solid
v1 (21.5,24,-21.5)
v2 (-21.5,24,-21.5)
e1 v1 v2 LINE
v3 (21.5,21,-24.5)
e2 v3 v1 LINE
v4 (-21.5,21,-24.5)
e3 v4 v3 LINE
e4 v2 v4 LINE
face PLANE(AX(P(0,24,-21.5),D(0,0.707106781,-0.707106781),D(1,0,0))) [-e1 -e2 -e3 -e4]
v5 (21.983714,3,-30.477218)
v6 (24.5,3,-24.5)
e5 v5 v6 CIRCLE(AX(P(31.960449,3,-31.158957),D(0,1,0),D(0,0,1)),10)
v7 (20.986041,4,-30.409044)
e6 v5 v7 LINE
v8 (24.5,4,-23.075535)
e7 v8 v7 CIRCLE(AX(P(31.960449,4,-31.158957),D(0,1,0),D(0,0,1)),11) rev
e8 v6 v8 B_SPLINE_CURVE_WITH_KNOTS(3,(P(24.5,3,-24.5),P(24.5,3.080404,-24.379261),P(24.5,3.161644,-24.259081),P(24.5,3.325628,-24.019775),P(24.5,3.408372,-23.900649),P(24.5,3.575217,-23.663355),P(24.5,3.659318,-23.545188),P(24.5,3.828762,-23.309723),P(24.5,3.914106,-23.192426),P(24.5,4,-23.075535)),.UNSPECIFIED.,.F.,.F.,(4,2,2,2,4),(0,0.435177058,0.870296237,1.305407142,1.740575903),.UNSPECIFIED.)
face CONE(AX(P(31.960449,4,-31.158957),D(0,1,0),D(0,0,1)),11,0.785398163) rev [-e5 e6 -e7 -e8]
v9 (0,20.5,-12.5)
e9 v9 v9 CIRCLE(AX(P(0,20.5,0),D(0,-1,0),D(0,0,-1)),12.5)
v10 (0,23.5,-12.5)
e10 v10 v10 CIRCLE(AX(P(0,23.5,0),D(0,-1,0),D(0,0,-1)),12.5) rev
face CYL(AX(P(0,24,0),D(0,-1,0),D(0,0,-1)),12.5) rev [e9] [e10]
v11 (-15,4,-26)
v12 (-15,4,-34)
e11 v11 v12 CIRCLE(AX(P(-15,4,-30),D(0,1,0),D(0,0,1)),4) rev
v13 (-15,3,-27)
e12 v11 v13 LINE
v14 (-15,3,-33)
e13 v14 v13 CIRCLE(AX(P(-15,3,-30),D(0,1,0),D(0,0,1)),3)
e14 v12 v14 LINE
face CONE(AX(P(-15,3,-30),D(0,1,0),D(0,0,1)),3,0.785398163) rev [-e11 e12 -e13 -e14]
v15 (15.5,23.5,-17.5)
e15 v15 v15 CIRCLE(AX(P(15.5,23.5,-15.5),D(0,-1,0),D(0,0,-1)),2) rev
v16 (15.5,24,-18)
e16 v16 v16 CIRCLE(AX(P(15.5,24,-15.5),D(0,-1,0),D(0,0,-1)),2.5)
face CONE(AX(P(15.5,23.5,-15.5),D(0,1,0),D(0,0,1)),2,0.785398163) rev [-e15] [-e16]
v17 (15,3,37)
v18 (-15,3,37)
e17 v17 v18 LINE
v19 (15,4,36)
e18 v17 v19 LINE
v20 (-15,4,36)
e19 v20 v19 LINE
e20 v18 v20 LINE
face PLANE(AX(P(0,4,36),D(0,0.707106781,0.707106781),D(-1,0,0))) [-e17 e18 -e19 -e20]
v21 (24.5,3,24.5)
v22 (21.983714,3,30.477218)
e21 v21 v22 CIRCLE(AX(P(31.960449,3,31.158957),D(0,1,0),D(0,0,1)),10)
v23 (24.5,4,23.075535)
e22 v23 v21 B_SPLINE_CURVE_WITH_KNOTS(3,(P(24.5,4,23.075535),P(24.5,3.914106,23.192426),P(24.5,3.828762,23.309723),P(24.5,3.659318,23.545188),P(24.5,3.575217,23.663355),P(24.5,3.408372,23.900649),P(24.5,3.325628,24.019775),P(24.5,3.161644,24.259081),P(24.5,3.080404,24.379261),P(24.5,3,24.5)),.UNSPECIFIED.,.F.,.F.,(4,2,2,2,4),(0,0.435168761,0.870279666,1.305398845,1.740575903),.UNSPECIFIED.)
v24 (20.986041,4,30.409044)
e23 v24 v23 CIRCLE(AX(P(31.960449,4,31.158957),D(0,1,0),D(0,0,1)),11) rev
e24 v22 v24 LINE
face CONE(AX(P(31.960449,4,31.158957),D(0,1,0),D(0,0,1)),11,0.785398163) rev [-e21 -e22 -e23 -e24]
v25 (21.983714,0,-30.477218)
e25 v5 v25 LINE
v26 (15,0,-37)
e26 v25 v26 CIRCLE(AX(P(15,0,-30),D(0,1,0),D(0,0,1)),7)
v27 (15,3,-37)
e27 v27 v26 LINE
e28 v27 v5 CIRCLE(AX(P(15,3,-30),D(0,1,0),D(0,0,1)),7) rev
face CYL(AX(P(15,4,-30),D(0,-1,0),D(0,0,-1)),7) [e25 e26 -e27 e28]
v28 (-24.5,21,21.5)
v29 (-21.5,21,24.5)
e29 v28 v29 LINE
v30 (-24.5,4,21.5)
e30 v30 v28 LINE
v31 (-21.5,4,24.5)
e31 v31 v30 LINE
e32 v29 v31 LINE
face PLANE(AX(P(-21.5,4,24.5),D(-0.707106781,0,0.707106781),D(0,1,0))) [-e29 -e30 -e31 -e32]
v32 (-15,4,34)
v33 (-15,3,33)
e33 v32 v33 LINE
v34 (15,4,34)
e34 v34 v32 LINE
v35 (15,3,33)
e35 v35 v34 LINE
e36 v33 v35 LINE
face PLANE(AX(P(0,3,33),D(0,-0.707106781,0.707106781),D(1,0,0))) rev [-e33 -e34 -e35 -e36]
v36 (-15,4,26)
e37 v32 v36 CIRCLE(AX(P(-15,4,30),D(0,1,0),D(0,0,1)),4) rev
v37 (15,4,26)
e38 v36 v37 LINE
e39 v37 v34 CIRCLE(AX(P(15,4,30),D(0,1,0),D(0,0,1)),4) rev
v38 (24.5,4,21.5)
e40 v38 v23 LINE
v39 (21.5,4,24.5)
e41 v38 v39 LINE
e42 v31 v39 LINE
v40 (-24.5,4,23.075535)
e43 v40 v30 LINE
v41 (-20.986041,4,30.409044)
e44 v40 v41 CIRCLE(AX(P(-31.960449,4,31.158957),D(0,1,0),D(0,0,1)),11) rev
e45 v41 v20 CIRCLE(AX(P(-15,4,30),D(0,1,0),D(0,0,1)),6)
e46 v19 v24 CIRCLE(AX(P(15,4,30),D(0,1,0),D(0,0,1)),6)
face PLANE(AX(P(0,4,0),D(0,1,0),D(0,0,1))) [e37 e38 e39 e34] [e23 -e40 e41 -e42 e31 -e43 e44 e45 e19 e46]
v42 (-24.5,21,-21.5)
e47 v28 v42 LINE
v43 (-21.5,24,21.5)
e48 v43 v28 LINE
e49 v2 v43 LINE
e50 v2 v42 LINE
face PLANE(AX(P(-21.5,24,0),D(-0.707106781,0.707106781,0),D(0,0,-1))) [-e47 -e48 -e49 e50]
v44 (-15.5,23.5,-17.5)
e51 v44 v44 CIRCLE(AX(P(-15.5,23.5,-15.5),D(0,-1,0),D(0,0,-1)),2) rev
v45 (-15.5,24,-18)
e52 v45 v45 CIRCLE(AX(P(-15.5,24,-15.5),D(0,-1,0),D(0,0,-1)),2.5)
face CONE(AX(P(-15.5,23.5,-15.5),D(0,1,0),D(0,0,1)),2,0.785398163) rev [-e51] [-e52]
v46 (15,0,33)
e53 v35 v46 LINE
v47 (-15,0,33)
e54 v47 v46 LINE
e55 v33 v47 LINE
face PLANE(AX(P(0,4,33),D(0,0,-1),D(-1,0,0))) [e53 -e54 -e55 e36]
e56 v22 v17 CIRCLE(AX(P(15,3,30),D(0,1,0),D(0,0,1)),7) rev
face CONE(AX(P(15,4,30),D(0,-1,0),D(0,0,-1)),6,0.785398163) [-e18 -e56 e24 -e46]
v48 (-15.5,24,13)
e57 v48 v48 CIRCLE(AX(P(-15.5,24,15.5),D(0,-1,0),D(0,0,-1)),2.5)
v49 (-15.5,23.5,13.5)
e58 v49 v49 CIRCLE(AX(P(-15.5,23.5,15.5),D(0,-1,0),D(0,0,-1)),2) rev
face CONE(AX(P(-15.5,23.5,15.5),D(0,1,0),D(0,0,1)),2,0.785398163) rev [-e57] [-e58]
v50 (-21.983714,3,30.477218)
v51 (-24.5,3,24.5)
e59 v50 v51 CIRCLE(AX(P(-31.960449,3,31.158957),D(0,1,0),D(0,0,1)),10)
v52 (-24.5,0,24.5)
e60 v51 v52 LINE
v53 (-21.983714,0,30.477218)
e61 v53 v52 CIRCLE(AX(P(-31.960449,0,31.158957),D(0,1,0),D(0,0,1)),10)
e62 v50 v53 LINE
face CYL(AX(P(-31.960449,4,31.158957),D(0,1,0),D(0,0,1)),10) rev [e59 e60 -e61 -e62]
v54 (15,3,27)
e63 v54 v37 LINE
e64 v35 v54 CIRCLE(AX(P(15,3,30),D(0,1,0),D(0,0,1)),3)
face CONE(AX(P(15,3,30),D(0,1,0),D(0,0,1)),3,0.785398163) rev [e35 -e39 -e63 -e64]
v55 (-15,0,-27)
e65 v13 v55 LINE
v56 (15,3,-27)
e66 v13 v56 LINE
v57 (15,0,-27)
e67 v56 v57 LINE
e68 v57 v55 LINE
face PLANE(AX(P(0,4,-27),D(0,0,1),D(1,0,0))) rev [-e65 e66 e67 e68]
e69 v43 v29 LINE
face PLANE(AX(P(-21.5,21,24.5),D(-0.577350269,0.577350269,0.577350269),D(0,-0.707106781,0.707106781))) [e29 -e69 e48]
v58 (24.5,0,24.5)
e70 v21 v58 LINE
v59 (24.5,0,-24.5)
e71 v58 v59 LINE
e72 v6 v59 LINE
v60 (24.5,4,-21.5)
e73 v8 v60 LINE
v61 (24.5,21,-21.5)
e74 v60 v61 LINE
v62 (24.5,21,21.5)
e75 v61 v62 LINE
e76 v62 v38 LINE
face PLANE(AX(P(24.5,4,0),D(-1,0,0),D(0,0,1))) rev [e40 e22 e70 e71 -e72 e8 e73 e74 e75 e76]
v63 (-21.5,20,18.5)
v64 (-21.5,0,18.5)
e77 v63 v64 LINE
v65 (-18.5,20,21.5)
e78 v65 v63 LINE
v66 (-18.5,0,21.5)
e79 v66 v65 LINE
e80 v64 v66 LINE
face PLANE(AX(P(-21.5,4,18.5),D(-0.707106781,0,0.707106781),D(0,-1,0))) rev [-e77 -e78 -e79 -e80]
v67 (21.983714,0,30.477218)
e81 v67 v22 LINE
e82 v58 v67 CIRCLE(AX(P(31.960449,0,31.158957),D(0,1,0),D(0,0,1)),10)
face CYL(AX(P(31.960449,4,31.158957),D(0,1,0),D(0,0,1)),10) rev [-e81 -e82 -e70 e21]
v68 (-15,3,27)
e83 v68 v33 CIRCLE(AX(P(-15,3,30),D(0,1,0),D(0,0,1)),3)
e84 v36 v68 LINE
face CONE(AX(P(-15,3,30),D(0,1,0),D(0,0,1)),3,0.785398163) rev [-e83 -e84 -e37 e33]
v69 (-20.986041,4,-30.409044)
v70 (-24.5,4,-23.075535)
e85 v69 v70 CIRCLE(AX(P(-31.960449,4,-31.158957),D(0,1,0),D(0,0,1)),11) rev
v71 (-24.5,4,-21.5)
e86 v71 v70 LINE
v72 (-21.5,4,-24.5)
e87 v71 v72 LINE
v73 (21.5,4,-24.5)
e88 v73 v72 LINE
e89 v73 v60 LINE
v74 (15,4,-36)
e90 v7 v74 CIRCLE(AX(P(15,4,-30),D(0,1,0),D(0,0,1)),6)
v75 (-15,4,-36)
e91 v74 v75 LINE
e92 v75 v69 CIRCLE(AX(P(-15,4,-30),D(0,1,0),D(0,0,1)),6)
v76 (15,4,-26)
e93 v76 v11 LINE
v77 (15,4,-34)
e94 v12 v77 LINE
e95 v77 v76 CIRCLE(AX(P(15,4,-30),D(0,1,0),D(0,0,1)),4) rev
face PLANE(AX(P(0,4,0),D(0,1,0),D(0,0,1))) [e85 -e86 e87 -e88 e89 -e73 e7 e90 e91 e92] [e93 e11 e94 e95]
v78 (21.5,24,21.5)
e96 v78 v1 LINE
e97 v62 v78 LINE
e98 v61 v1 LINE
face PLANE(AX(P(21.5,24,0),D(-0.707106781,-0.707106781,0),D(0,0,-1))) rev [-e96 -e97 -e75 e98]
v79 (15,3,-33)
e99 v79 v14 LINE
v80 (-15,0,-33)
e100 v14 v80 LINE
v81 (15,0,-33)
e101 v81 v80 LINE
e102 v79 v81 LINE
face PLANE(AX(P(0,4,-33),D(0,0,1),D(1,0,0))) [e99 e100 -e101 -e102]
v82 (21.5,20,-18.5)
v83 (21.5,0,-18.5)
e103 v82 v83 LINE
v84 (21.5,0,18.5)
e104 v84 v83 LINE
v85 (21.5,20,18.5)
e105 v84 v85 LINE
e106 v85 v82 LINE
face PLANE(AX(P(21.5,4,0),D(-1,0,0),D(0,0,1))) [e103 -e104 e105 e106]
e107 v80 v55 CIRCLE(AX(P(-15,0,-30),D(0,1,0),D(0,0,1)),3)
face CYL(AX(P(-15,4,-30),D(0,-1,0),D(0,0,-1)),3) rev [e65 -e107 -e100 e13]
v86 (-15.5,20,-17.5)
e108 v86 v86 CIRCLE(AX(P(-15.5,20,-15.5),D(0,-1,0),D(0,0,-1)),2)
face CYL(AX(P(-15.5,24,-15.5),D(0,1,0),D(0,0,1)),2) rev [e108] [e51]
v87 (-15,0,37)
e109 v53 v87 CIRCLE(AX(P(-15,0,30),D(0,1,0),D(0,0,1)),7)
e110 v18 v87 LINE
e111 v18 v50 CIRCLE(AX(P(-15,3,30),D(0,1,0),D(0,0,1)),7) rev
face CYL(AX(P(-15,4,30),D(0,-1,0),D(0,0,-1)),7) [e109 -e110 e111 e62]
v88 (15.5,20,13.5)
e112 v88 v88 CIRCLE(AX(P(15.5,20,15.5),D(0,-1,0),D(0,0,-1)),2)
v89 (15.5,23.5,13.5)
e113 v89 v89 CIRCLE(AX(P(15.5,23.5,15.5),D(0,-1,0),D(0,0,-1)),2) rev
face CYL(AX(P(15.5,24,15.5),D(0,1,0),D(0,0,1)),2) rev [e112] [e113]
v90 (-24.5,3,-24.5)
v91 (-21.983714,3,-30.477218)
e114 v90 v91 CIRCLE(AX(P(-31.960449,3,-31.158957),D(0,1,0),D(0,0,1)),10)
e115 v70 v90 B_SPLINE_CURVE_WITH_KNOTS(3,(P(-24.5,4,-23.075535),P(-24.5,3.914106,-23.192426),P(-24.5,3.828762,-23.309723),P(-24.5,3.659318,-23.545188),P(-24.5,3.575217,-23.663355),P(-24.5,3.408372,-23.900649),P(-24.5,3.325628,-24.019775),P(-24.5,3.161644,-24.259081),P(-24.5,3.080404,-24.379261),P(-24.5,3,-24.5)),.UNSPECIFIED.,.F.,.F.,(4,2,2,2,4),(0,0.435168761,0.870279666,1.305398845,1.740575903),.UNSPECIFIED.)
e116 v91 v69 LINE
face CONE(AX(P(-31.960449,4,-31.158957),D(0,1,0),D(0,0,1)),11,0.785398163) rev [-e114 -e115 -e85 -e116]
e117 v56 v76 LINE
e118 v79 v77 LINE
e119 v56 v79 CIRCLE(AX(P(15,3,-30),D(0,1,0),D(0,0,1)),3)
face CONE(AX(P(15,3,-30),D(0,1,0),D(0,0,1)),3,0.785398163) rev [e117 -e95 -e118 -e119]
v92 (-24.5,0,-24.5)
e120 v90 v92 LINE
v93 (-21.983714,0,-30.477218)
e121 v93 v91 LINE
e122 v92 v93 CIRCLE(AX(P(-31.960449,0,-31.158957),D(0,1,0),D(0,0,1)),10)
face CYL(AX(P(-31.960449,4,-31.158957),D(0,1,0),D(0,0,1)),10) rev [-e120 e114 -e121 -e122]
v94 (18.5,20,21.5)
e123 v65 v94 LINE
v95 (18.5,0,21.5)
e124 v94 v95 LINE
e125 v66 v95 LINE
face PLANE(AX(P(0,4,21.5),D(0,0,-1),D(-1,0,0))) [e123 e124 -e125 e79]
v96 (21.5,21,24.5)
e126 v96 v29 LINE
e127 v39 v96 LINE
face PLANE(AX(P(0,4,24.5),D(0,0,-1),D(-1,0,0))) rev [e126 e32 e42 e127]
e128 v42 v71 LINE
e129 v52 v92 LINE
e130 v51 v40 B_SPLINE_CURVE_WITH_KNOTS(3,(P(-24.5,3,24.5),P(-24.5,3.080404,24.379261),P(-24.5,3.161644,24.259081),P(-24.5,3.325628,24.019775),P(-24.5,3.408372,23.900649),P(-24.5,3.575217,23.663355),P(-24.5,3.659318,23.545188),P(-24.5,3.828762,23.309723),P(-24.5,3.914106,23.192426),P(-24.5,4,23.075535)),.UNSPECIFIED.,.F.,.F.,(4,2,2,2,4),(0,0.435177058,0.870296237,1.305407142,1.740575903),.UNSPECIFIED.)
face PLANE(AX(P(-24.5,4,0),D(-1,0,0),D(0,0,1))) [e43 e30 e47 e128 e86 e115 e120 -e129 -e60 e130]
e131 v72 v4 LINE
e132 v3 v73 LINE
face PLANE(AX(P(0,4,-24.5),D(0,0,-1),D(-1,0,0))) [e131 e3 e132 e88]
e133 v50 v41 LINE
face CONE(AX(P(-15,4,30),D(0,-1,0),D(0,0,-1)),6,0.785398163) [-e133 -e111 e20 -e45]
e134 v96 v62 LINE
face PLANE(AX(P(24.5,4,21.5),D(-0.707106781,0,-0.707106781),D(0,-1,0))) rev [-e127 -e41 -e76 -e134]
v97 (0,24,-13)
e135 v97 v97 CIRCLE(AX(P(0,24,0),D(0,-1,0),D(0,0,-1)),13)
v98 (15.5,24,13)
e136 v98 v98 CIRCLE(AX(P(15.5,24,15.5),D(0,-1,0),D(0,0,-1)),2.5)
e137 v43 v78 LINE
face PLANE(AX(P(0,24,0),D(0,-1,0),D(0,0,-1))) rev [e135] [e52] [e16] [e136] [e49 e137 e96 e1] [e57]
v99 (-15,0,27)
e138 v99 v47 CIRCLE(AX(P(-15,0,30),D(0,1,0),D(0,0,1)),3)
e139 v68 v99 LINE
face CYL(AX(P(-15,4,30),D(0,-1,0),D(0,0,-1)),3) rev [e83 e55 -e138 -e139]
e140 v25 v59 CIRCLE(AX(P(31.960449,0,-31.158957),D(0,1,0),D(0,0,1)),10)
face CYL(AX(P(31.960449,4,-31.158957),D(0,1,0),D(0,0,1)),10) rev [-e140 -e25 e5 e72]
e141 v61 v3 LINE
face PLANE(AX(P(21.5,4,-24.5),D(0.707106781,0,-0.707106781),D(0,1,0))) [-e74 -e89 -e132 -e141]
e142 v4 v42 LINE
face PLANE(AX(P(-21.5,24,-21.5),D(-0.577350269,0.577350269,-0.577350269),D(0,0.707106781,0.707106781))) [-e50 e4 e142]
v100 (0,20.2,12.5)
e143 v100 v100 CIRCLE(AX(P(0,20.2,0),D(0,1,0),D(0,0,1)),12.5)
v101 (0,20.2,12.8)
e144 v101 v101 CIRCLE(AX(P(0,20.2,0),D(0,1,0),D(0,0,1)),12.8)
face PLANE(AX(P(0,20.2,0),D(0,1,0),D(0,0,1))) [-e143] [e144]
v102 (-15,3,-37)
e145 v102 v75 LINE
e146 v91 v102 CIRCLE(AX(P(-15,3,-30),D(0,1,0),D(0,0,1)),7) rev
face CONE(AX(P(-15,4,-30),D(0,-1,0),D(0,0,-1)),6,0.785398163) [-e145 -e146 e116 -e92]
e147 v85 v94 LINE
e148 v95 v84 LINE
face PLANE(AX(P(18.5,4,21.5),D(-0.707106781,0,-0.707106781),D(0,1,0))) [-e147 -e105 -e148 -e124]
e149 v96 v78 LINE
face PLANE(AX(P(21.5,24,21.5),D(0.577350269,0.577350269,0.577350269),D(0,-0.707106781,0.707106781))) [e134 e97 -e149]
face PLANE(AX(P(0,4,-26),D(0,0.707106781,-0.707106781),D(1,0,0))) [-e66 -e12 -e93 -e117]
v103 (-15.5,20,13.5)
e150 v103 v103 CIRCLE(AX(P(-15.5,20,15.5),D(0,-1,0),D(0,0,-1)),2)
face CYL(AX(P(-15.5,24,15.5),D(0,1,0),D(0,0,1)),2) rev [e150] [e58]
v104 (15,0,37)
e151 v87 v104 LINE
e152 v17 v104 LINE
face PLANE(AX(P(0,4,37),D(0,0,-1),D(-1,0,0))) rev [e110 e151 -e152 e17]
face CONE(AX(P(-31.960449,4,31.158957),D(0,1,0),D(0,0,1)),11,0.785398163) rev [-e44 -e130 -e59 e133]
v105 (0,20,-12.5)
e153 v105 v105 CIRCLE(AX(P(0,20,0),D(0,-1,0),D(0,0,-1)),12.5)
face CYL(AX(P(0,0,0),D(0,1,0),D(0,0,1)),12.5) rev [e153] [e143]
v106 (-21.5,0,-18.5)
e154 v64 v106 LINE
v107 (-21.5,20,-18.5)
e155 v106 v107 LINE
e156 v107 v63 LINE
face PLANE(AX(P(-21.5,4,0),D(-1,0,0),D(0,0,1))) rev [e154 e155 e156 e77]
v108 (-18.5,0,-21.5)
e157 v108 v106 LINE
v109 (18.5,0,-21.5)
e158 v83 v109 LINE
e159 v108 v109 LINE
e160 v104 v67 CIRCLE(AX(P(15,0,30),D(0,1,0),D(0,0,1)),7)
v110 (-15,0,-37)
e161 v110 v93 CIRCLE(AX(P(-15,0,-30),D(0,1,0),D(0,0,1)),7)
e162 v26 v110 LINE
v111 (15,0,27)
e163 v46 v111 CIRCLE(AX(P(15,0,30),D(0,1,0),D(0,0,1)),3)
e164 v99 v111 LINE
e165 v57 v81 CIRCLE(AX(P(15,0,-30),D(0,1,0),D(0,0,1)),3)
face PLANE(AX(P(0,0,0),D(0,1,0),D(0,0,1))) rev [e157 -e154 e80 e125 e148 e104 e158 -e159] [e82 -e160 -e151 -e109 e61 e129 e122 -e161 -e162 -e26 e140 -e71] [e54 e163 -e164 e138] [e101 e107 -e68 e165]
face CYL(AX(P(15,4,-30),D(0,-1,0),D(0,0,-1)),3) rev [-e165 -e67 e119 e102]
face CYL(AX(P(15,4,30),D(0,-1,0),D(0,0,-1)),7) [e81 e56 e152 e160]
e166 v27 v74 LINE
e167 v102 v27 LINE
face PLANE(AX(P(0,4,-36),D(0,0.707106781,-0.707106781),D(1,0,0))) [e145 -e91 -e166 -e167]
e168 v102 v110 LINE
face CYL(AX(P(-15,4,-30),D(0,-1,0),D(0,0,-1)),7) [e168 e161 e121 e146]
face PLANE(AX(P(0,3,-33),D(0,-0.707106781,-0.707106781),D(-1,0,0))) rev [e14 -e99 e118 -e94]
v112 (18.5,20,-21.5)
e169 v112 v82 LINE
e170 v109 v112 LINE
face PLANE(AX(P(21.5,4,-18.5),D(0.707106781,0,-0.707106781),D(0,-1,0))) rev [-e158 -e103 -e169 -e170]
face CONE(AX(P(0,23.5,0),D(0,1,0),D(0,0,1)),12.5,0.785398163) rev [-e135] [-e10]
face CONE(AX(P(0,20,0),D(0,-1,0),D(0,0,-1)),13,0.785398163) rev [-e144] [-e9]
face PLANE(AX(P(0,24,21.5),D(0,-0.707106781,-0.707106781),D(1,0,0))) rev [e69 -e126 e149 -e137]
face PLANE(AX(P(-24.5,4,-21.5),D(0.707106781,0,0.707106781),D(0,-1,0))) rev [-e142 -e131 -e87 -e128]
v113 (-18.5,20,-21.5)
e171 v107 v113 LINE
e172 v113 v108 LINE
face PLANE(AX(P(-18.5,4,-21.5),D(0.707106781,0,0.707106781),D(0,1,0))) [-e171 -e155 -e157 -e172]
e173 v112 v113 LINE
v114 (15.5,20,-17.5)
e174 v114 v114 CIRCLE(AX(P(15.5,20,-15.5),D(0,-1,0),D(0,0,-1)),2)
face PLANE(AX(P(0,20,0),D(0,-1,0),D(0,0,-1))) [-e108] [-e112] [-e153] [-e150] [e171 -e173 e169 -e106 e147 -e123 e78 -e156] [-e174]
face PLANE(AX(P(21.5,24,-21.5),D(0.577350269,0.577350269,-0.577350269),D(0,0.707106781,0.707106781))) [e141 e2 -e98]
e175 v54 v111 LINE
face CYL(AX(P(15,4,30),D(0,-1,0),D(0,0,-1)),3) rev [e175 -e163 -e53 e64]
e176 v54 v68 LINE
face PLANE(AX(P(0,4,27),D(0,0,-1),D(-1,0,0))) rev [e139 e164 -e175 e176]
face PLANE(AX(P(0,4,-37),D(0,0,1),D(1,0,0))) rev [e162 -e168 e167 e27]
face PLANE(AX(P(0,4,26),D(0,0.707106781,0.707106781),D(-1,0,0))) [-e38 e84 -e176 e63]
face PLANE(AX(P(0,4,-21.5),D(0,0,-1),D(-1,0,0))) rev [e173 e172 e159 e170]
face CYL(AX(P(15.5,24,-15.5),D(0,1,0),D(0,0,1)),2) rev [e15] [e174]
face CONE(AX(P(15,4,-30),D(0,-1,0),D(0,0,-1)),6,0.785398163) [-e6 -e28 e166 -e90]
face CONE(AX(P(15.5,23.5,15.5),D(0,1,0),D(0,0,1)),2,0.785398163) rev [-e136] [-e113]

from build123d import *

# Parameters (mm, degrees)
SKETCH1_W             = 43
SKETCH1_H             = 43
BOSS_EXTRUDE1_DEPTH   = 4
SKETCH2_W             = 49
SKETCH2_H             = 49
SKETCH2_W_2           = 43
SKETCH2_H_2           = 43
BOSS_EXTRUDE2_DEPTH   = 16
FILLET1_R             = 10
SKETCH3_W             = 49
SKETCH3_H             = 49
SKETCH3_R             = 12.5
BOSS_EXTRUDE3_DEPTH   = 4
F_4_0MM_DOWEL_HOLE1_D = 4
CHAMFER1_SIZE         = 3
CHAMFER3_SIZE         = 0.5
CHAMFER4_SIZE         = 1
SKETCH8_W             = 38.715759924
SKETCH8_H             = 37.056710796
BOSS_EXTRUDE4_DEPTH   = 0.2
SKETCH9_R             = 12.5
CUT_EXTRUDE2_DEPTH    = 49.757460968
SKETCH10_R            = 2
CUT_EXTRUDE3_DEPTH    = 49.757460968


with BuildPart() as part:
    # Sketch1 → Boss-Extrude1 (new body)
    with BuildSketch(Plane(origin=(0, 0, 0), x_dir=(1, 0, 0), z_dir=(0, 1, 0))):
        with BuildLine():
            Line((-24.5, 24.5), (-19.330127019, 24.5))
            ThreePointArc((-19.330127019, 24.5), (-21.614378278, 32.291287847), (-15, 37))
            Line((-15, 37), (15, 37))
            ThreePointArc((15, 37), (21.614378278, 32.291287847), (19.330127019, 24.5))
            Line((19.330127019, 24.5), (24.5, 24.5))
            Line((24.5, 24.5), (24.5, 6.437196595))
            Line((24.5, 6.437196595), (24.5, -24.5))
            Line((24.5, -24.5), (19.330127019, -24.5))
            ThreePointArc((19.330127019, -24.5), (21.614378278, -32.291287847), (15, -37))
            Line((15, -37), (-15, -37))
            ThreePointArc((-15, -37), (-21.614378278, -32.291287847), (-19.330127019, -24.5))
            Line((-19.330127019, -24.5), (-24.5, -24.5))
            Line((-24.5, -24.5), (-24.5, 6.437196595))
            Line((-24.5, 6.437196595), (-24.5, 24.5))
        make_face()
        Rectangle(SKETCH1_W, SKETCH1_H, mode=Mode.SUBTRACT)
        with BuildLine():
            Line((15, 27), (-15, 27))
            ThreePointArc((-15, 27), (-18, 30), (-15, 33))
            Line((-15, 33), (15, 33))
            ThreePointArc((15, 33), (18, 30), (15, 27))
        make_face(mode=Mode.SUBTRACT)
        with BuildLine():
            Line((-15, -27), (15, -27))
            ThreePointArc((15, -27), (18, -30), (15, -33))
            Line((15, -33), (-15, -33))
            ThreePointArc((-15, -33), (-18, -30), (-15, -27))
        make_face(mode=Mode.SUBTRACT)
    extrude(amount=BOSS_EXTRUDE1_DEPTH)

    # Sketch2 → Boss-Extrude2 (add)
    with BuildSketch(Plane(origin=(0, 4, 0), x_dir=(1, 0, 0), z_dir=(0, 1, 0))):
        Rectangle(SKETCH2_W, SKETCH2_H)
        Rectangle(SKETCH2_W_2, SKETCH2_H_2, mode=Mode.SUBTRACT)
    extrude(amount=BOSS_EXTRUDE2_DEPTH)

    # Fillet1
    # the kernel refuses this fillet: 10 mm, written as the material it adds along each edge
    with BuildSketch(Plane(origin=(19.330127019, 0, 24.5), x_dir=(0.405761244184207, 0, 0.913979109563279), z_dir=(0, 1, 0))) as fillet1_piece_1:
        with BuildLine():
            CenterArc((11.211042432, 8.841903543), FILLET1_R, 204.310084353, 37.841965765)
            Line((2.097734093, 4.725155904), (1.915467926, 4.642820951))
            ThreePointArc((1.915467926, 4.642820951), (0.866071225, 2.443730201), (-0.182795822, 0.081152249))
            Line((-0.182795822, 0.081152249), (0.093425354, -0.176838071))
            ThreePointArc((0.093425354, -0.176838071), (3.269887376, 0.61066752), (6.446349398, -0.176838071))
            Line((6.446349398, -0.176838071), (6.539774752, 0))
        make_face()
    extrude(amount=4)
    with BuildSketch(Plane(origin=(19.330127019, 0, -24.5), x_dir=(1, 0, 0), z_dir=(0, 1, 0))) as fillet1_piece_2:
        with BuildLine():
            CenterArc((12.630321653, 6.658956796), FILLET1_R, 183.909110465, 37.841965765)
            Line((2.65358714, 5.977217504), (2.45405245, 5.963582719))
            ThreePointArc((2.45405245, 5.963582719), (1.884930926, 2.74082354), (-0.123717915, 0.157142857))
            Line((-0.123717915, 0.157142857), (0, -0.2))
            ThreePointArc((0, -0.2), (2.584936491, -0.2), (5.020664008, -0.133179136))
            Line((5.020664008, -0.133179136), (5.169872981, 0))
        make_face()
    extrude(amount=4)
    with BuildSketch(Plane(origin=(-19.330127019, 0, -24.5), x_dir=(-1, 0, 0), z_dir=(0, 1, 0))) as fillet1_piece_3:
        with BuildLine():
            CenterArc((12.630321653, -6.658956796), FILLET1_R, 138.24892377, 37.841965765)
            Line((2.65358714, -5.977217504), (2.45405245, -5.963582719))
            ThreePointArc((2.45405245, -5.963582719), (1.884930926, -2.74082354), (-0.123717915, -0.157142857))
            Line((-0.123717915, -0.157142857), (0, 0.2))
            ThreePointArc((0, 0.2), (2.584936491, 0.2), (5.020664008, 0.133179136))
            Line((5.020664008, 0.133179136), (5.169872981, 0))
        make_face()
    extrude(amount=4)
    with BuildSketch(Plane(origin=(-19.330127019, 0, 24.5), x_dir=(-0.40576124418420745, 0, 0.9139791095632787), z_dir=(0, 1, 0))) as fillet1_piece_4:
        with BuildLine():
            CenterArc((11.211042432, -8.841903543), FILLET1_R, 117.847949882, 37.841965765)
            Line((2.097734093, -4.725155904), (1.915467926, -4.642820951))
            ThreePointArc((1.915467926, -4.642820951), (0.866071225, -2.443730201), (-0.182795822, -0.081152249))
            Line((-0.182795822, -0.081152249), (0.093425354, 0.176838071))
            ThreePointArc((0.093425354, 0.176838071), (3.269887376, -0.61066752), (6.446349398, 0.176838071))
            Line((6.446349398, 0.176838071), (6.539774752, 0))
        make_face()
    extrude(amount=4)

    # Sketch3 → Boss-Extrude3 (add)
    with BuildSketch(Plane(origin=(0, 20, 0), x_dir=(1, 0, 0), z_dir=(0, 1, 0))):
        Rectangle(SKETCH3_W, SKETCH3_H)
        with Locations(Location((0, 0, 0), (0, 0, 270))):
            Circle(SKETCH3_R, mode=Mode.SUBTRACT)
    extrude(amount=BOSS_EXTRUDE3_DEPTH)

    # Ø4.0mm Dowel Hole1 (through all)
    with Locations(Plane(origin=(0, 24, 0), x_dir=(1, 0, 0), z_dir=(0, 1, 0))):
        with Locations((15.5, 15.5), (-15.5, 15.5), (-15.5, -15.5), (15.5, -15.5)):
            Hole(F_4_0MM_DOWEL_HOLE1_D / 2)

    # Chamfer1
    chamfer1_edges = [part.edges().sort_by_distance(p)[0] for p in [
        (24.5, 24, 0),
        (0, 24, -24.5),
        (-24.5, 24, 0),
        (0, 24, 24.5),
        (-24.5, 14, 24.5),
        (-24.5, 14, -24.5),
        (24.5, 14, -24.5),
        (24.5, 14, 24.5),
        (-21.5, 10, -21.5),
        (-21.5, 10, 21.5),
        (21.5, 10, 21.5),
        (21.5, 10, -21.5),
    ]]
    chamfer(chamfer1_edges, length=CHAMFER1_SIZE)

    # Chamfer3
    chamfer3_edges = [part.edges().sort_by_distance(p)[0] for p in [
        (0, 20, -12.5),
        (0, 24, -12.5),
        (17.5, 24, 15.5),
        (-13.5, 24, 15.5),
        (-13.5, 24, -15.5),
        (17.5, 24, -15.5),
    ]]
    chamfer(chamfer3_edges, length=CHAMFER3_SIZE)

    # Chamfer4
    chamfer4_edges = [part.edges().sort_by_distance(p)[0] for p in [
        (-19.778047586, 4, 35.115687761),
        (19.778047586, 4, -35.115687761),
        (0, 4, -37),
        (-22.743853768, 4, 27.278959583),
        (22.743853768, 4, 27.278959583),
        (22.743853768, 4, -27.278959583),
        (-22.743853768, 4, -27.278959583),
        (-19.778047586, 4, -35.115687761),
        (18, 4, 30),
        (0, 4, 33),
        (-18, 4, 30),
        (18, 4, -30),
        (0, 4, -27),
        (-18, 4, -30),
        (0, 4, -33),
        (0, 4, 37),
        (19.778047586, 4, 35.115687761),
        (0, 4, 27),
    ]]
    chamfer(chamfer4_edges, length=CHAMFER4_SIZE)

    # Sketch8 → Boss-Extrude4 (add)
    with BuildSketch(Plane.XZ.offset(-20)):
        Rectangle(SKETCH8_W, SKETCH8_H)
    extrude(amount=-BOSS_EXTRUDE4_DEPTH)

    # Sketch9 → Cut-Extrude2 (cut, through all)
    with BuildSketch(Plane(origin=(0, 20.2, 0), x_dir=(1, 0, 0), z_dir=(0, 1, 0))):
        with Locations(Location((0, 0, 0), (0, 0, 90))):
            Circle(SKETCH9_R)
    extrude(amount=-CUT_EXTRUDE2_DEPTH, mode=Mode.SUBTRACT)

    # Sketch10 → Cut-Extrude3 (cut, through all)
    with BuildSketch(Plane(origin=(0, 20.2, 0), x_dir=(1, 0, 0), z_dir=(0, 1, 0))):
        with Locations(Location((-15.5, 15.5, 0), (0, 0, 90))):
            Circle(SKETCH10_R)
        with Locations(Location((-15.5, -15.5, 0), (0, 0, 90))):
            Circle(SKETCH10_R)
        with Locations(Location((15.5, -15.5, 0), (0, 0, 90))):
            Circle(SKETCH10_R)
        with Locations(Location((15.5, 15.5, 0), (0, 0, 90))):
            Circle(SKETCH10_R)
    extrude(amount=-CUT_EXTRUDE3_DEPTH, mode=Mode.SUBTRACT)


solid = part.part
